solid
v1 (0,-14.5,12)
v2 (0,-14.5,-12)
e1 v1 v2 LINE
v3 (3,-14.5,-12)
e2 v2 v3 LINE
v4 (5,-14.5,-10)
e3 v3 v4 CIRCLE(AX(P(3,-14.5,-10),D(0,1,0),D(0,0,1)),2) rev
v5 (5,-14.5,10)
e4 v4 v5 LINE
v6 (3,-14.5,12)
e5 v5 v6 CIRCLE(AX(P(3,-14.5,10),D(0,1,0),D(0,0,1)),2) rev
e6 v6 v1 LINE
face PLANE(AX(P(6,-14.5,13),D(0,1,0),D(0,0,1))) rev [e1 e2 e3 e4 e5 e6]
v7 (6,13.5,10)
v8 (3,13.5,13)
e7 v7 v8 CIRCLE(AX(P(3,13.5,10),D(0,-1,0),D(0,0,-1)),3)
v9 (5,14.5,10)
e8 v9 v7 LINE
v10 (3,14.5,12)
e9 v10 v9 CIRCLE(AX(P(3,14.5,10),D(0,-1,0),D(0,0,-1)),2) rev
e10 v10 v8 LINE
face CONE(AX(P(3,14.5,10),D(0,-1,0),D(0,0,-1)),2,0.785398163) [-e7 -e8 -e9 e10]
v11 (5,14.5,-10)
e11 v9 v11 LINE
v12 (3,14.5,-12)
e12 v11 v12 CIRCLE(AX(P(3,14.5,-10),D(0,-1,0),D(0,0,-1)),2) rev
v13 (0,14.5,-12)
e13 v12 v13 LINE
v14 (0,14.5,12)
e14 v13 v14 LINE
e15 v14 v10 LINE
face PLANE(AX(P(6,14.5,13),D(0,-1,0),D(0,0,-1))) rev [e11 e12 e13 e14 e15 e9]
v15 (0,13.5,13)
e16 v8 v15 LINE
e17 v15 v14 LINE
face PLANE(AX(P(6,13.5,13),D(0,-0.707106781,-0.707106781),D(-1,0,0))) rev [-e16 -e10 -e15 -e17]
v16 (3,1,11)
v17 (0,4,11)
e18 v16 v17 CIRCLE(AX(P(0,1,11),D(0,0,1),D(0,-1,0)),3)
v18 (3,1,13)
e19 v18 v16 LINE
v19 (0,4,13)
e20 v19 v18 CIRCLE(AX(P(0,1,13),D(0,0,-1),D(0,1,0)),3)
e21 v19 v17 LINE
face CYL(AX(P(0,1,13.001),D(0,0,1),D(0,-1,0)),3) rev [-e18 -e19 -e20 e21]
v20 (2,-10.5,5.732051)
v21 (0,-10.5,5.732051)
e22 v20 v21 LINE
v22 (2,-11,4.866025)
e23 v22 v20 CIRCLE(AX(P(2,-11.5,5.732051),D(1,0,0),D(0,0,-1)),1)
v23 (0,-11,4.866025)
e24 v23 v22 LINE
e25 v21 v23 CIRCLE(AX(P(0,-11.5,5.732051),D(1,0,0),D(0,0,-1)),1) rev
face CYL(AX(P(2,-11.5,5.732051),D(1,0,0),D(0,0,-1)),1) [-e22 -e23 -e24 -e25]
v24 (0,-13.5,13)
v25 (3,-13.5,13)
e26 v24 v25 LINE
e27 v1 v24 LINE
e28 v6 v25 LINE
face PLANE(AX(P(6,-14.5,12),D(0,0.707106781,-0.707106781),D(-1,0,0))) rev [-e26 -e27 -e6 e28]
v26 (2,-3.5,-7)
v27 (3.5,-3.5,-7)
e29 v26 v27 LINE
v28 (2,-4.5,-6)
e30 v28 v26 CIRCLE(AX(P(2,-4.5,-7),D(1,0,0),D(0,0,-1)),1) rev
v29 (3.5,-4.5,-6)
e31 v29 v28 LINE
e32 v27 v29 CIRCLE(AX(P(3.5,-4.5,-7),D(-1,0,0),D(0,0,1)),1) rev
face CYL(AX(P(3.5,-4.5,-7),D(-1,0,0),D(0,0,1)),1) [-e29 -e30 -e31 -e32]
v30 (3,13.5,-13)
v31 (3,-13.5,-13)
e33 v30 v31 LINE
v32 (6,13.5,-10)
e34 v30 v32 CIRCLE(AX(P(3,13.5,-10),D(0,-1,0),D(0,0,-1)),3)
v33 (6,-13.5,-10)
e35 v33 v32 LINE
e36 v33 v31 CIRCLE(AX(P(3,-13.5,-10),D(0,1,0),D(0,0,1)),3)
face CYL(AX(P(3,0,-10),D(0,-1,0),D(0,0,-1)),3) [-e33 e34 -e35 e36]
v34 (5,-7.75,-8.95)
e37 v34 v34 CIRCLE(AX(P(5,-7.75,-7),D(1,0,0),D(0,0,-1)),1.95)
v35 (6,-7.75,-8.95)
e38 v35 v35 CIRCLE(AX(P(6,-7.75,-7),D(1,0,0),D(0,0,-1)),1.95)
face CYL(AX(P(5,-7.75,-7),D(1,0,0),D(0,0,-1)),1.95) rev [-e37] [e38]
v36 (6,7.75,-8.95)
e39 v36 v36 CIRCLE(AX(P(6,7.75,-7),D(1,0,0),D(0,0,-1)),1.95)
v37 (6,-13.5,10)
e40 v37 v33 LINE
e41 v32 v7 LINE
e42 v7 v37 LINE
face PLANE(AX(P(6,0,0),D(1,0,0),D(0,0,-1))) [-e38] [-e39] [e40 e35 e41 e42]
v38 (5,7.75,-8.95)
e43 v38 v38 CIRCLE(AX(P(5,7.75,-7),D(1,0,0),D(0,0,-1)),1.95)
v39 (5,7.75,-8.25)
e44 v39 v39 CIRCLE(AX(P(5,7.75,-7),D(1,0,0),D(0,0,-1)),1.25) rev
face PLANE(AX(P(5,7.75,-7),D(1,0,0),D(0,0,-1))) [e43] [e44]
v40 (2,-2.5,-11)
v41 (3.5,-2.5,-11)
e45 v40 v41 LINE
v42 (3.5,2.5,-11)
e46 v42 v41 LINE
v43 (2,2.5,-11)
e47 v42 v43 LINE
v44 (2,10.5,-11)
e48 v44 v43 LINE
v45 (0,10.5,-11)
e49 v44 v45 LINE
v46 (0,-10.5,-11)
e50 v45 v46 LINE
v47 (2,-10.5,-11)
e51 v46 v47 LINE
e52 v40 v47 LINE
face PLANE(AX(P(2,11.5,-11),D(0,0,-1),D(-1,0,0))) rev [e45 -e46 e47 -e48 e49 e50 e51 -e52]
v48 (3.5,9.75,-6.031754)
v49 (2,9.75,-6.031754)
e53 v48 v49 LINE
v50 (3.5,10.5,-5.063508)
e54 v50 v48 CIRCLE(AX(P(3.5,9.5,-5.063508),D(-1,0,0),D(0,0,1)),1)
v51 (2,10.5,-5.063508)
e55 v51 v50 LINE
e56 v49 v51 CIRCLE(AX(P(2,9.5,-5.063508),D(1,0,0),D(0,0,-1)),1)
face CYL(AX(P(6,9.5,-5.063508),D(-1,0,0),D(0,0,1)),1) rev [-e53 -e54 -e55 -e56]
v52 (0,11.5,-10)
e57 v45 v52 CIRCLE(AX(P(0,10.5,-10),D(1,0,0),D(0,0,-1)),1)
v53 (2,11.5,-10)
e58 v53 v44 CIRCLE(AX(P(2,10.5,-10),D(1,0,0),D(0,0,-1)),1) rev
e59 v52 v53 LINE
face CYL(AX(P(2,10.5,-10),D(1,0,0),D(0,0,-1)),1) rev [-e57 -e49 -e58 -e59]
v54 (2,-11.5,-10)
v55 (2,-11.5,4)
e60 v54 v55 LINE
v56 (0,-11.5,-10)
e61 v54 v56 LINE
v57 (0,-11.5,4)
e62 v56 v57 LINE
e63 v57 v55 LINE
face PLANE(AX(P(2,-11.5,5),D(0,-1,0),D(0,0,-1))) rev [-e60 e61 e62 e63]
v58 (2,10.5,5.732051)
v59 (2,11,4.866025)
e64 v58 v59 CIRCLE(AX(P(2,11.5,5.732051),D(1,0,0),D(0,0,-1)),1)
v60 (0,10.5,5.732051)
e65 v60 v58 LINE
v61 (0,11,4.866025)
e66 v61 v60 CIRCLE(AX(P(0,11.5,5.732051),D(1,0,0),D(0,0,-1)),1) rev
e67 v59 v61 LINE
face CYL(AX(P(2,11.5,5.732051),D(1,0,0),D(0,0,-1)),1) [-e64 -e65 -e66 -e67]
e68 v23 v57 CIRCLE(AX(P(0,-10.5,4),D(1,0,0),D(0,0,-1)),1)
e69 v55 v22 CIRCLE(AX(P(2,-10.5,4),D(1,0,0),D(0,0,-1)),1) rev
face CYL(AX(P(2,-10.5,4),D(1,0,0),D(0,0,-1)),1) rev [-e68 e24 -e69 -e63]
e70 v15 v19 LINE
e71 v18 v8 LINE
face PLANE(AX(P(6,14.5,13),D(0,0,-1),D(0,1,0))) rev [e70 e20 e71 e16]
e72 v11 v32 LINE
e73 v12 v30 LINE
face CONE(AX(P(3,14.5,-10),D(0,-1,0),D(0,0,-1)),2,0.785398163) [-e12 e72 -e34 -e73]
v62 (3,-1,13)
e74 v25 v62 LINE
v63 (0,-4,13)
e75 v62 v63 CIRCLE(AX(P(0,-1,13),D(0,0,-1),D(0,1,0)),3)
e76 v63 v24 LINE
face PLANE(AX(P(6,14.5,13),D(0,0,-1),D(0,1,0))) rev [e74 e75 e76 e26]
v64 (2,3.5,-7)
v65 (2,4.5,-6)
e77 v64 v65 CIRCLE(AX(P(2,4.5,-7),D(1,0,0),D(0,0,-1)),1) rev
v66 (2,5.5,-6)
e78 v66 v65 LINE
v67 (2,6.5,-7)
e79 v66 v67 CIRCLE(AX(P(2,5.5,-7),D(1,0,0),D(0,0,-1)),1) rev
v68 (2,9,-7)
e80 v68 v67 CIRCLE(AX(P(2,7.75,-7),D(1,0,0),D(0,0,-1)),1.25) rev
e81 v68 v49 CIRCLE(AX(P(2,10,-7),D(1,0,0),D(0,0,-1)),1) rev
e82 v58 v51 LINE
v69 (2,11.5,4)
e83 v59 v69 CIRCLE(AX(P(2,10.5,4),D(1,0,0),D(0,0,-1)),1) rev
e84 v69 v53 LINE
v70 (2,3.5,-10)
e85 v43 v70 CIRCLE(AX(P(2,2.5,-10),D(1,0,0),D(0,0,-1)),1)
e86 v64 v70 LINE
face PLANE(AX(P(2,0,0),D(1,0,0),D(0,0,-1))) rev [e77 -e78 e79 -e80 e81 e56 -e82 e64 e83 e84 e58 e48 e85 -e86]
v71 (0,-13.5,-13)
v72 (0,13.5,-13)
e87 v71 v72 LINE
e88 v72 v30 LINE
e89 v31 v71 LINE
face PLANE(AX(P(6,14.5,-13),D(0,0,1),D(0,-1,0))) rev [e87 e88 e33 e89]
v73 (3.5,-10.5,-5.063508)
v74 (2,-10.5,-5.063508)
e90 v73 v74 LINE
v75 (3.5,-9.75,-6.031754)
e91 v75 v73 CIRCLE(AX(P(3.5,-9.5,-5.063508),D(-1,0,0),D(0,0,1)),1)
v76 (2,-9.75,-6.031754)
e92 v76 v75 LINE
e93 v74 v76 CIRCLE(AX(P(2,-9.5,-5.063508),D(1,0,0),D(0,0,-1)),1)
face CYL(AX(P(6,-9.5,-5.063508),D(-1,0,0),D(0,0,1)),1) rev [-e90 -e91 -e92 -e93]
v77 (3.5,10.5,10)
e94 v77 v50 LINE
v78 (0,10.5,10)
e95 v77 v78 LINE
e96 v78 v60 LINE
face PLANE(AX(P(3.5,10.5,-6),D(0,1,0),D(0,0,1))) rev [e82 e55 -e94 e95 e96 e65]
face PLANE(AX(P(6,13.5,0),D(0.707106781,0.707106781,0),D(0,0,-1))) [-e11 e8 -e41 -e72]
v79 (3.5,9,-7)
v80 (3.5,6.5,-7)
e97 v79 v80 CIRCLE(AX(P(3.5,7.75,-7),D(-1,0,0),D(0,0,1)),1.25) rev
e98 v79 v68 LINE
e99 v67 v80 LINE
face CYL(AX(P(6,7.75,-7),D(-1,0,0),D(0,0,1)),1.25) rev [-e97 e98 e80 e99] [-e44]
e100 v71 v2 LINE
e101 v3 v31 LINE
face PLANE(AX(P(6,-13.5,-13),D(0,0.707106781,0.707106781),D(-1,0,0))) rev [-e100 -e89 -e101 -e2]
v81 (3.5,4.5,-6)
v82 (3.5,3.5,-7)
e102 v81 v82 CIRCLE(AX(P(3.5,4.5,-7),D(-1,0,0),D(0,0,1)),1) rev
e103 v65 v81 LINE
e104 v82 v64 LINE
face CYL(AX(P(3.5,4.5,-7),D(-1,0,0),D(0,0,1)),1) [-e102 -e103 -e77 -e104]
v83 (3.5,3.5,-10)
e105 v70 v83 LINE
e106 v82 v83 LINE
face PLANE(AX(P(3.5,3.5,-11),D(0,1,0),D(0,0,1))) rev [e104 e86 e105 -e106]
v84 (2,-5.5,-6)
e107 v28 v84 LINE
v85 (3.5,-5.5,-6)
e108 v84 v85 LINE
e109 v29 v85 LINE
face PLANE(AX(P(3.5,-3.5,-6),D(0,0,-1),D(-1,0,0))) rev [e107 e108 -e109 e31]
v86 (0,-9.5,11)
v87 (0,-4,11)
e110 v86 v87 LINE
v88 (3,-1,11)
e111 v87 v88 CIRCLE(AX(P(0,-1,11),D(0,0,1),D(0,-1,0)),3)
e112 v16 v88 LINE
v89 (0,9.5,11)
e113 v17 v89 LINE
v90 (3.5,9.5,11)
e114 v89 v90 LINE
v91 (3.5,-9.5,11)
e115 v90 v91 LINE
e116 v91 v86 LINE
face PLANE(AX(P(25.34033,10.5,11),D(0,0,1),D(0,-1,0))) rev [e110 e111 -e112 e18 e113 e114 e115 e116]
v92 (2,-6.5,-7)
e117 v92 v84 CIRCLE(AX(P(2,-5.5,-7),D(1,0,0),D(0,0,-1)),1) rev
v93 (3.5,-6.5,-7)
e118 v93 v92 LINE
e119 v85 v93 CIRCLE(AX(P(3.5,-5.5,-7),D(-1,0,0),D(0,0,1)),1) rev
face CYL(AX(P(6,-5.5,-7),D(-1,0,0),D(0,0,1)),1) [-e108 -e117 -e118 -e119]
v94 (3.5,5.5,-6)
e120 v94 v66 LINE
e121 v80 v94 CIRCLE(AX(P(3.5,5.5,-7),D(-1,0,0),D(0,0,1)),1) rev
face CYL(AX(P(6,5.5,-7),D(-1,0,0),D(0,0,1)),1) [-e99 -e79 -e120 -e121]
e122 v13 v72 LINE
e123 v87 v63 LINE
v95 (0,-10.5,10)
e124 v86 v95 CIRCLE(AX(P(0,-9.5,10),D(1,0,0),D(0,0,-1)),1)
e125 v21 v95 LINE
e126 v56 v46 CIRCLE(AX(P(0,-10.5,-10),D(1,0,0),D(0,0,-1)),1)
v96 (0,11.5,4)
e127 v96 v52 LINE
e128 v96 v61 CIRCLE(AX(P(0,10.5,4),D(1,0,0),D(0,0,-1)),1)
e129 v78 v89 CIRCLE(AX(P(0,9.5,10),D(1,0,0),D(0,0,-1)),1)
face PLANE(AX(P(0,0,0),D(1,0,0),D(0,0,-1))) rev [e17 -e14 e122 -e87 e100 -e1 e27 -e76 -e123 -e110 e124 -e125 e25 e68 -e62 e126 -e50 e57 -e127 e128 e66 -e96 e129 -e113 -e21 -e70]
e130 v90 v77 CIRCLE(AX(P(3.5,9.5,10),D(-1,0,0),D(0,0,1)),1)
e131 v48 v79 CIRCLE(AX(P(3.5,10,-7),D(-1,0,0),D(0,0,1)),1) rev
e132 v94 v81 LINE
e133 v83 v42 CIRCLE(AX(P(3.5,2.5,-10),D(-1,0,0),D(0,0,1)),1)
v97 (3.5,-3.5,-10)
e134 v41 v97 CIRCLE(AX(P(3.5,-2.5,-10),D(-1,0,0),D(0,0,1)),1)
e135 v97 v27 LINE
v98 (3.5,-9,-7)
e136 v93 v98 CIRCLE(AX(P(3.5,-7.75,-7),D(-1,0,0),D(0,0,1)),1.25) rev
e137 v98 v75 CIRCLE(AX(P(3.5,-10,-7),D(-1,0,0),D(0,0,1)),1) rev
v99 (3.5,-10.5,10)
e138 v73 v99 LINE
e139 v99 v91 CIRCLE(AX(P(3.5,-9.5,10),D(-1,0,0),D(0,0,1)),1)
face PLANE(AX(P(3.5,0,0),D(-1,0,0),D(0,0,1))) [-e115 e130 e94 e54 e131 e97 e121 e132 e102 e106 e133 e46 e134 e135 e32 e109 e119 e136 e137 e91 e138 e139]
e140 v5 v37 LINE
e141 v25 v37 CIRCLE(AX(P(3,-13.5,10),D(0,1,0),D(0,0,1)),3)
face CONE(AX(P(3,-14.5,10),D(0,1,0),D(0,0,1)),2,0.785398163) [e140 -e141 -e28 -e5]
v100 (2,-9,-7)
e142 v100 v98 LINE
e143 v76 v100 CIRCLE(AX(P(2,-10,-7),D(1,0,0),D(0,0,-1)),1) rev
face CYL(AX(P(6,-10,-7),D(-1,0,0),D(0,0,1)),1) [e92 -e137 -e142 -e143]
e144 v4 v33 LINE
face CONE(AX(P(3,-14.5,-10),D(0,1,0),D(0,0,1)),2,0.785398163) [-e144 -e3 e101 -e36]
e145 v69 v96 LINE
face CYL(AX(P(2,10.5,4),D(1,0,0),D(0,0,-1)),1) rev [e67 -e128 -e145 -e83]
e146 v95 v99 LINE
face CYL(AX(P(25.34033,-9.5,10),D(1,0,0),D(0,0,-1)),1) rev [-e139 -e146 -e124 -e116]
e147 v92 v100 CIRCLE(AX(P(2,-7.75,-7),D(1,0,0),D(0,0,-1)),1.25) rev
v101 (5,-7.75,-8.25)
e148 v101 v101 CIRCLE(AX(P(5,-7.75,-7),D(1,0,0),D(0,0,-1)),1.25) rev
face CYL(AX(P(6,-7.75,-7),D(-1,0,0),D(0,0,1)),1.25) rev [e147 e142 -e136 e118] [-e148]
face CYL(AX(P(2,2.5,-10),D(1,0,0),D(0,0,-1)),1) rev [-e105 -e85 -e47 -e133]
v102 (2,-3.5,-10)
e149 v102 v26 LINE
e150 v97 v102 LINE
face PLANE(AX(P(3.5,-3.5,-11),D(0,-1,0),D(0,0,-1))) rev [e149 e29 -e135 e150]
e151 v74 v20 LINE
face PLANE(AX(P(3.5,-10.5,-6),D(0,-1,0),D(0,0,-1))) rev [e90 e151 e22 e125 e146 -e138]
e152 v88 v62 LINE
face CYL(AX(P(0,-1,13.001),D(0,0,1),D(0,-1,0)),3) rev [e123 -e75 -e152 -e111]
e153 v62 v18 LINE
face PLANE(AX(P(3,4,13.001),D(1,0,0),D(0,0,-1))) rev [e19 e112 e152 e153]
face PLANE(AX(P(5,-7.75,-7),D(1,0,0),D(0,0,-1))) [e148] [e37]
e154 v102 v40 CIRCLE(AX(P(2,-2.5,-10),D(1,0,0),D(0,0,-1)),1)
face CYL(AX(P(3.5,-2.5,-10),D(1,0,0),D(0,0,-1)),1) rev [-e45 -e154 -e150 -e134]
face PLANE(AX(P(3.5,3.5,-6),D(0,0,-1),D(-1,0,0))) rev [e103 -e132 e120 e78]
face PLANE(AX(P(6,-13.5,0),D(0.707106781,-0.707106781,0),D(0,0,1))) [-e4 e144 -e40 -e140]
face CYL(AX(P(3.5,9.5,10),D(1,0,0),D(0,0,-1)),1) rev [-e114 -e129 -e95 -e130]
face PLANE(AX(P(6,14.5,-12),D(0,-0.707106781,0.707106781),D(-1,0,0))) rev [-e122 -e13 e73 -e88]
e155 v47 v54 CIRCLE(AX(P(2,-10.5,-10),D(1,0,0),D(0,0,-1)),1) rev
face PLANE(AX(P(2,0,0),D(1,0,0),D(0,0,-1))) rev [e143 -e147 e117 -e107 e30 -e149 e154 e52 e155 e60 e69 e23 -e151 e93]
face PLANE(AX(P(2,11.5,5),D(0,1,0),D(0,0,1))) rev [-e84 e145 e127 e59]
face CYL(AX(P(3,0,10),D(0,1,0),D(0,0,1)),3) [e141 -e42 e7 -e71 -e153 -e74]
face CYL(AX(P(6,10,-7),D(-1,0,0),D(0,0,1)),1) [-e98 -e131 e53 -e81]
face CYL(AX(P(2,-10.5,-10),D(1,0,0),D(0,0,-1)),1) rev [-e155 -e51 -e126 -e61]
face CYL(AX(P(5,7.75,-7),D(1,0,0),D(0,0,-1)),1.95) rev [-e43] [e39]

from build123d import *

# Parameters (mm, degrees)
SKETCH_1_W          = 26
SKETCH_1_H          = 29
EXTRUDE_1_DEPTH     = 6
SKETCH_2_R          = 1.25
CUT_EXTRUDE_1_DEPTH = 21.377683872
SKETCH_4_W          = 16
SKETCH_4_H          = 23
CUT_EXTRUDE_3_DEPTH = 2
CUT_EXTRUDE_4_DEPTH = 1.5
FILLET_1_R          = 1
SKETCH_6_R          = 1.95
CUT_EXTRUDE_5_DEPTH = 1
FILLET_3_R          = 3
SKETCH_8_W          = 6
SKETCH_8_H          = 21
CUT_EXTRUDE_6_DEPTH = 3.5
FILLET_2_R          = 1
FILLET_4_R          = 1
CUT_EXTRUDE_7_REACH = 30.675
SKETCH_9_W          = 6
SKETCH_9_H          = 8
FILLET_5_R          = 3
CHAMFER_2_SIZE      = 1


# Some blends are built 0.0001 mm under size
with BuildPart() as part:
    # Эскиз1 → Бобышка-Вытянуть1 (new body)
    with BuildSketch(Plane(origin=(0, 0, 0), x_dir=(0, 0, -1), z_dir=(1, 0, 0))):
        Rectangle(SKETCH_1_W, SKETCH_1_H)
    extrude(amount=EXTRUDE_1_DEPTH)

    # Эскиз2 → Вырез-Вытянуть1 (cut, through all)
    with BuildSketch(Plane.ZY):
        with Locations((-7, 7.75)):
            Circle(SKETCH_2_R)
        with Locations((-7, -7.75)):
            Circle(SKETCH_2_R)
    extrude(amount=-CUT_EXTRUDE_1_DEPTH, mode=Mode.SUBTRACT)

    # Эскиз4 → Вырез-Вытянуть3 (cut)
    with BuildSketch(Plane.ZY):
        with Locations((-3, 0)):
            Rectangle(SKETCH_4_W, SKETCH_4_H)
    extrude(amount=-CUT_EXTRUDE_3_DEPTH, mode=Mode.SUBTRACT)

    # Эскиз5 → Вырез-Вытянуть4 (cut)
    with BuildSketch(Plane.ZY.offset(-2)):
        Polygon((-11, -3.5), (-11, 3.5), (-6, 3.5), (-6, 10.5), (5, 10.5), (5, -10.5), (-6, -10.5), (-6, -3.5), align=None)
    extrude(amount=-CUT_EXTRUDE_4_DEPTH, mode=Mode.SUBTRACT)

    # Скругление1
    fillet_1_edges = [part.edges().sort_by_distance(p)[0] for p in [
        (2.75, 7, -6),
        (2.75, 3.5, -6),
        (2.75, 8.5, -6),
        (2.75, -8.5, -6),
        (2.75, -7, -6),
        (2.75, 3.5, -11),
        (2.75, -3.5, -6),
        (2.75, -3.5, -11),
    ]]
    fillet(fillet_1_edges, radius=FILLET_1_R)

    # Эскиз6 → Вырез-Вытянуть5 (cut)
    with BuildSketch(Plane(origin=(6, 0, 0), x_dir=(0, 0, -1), z_dir=(1, 0, 0))):
        with Locations((7, 7.75)):
            Circle(SKETCH_6_R)
        with Locations((7, -7.75)):
            Circle(SKETCH_6_R)
    extrude(amount=-CUT_EXTRUDE_5_DEPTH, mode=Mode.SUBTRACT)

    # Скругление3
    fillet_3_edges = [part.edges().sort_by_distance(p)[0] for p in [
        (6, 0, 13),
        (6, 0, -13),
    ]]
    fillet(fillet_3_edges, radius=FILLET_3_R)

    # Эскиз8 → Вырез-Вытянуть6 (cut)
    with BuildSketch(Plane.ZY):
        with Locations((8, 0)):
            Rectangle(SKETCH_8_W, SKETCH_8_H)
    extrude(amount=-CUT_EXTRUDE_6_DEPTH, mode=Mode.SUBTRACT)

    # Скругление2
    fillet_2_edges = [part.edges().sort_by_distance(p)[0] for p in [
        (1, -11.5, -11),
        (1, -11.5, 5),
        (2.75, -10.5, -6),
        (1, 11.5, -11),
        (1, 11.5, 5),
        (2.75, 10.5, -6),
        (1.75, -10.5, 11),
        (1.75, 10.5, 11),
    ]]
    fillet(fillet_2_edges, radius=FILLET_2_R - 0.0001)  # a hair under: the kernel refuses the full size

    # Скругление4
    # the kernel refuses this fillet: 1 mm, written as the material it takes off along each edge
    with BuildSketch(Plane(origin=(-1.830232679, -10.5, 5), x_dir=(0, 0, 1), z_dir=(1, 0, 0))) as fillet_4_piece_1:
        with BuildLine():
            CenterArc((0.732093072, 1), FILLET_4_R, 209.998345944, 60.001654056)
            Line((-0.133946766, 0.500025001), (-0.22055075, 0.450027501))
            ThreePointArc((-0.22055075, 0.450027501), (-0.1, 0.0001), (-0.1, 0))
            Line((-0.1, 0), (0, -0.1))
            Line((0, -0.1), (0.732093072, -0.1))
            Line((0.732093072, -0.1), (0.732093072, 0))
        make_face()
    extrude(amount=3.830232679, mode=Mode.SUBTRACT)
    with BuildSketch(Plane(origin=(-1.830232679, 10.5, 5), x_dir=(0, 0, 1), z_dir=(1, 0, 0))) as fillet_4_piece_2:
        with BuildLine():
            CenterArc((0.732093072, -1), FILLET_4_R, 90, 60.001654056)
            Line((-0.133946766, -0.500025001), (-0.22055075, -0.450027501))
            ThreePointArc((-0.22055075, -0.450027501), (-0.1, -0.0001), (-0.1, 0))
            Line((-0.1, 0), (0, 0.1))
            Line((0, 0.1), (0.732093072, 0.1))
            Line((0.732093072, 0.1), (0.732093072, 0))
        make_face()
    extrude(amount=3.830232679, mode=Mode.SUBTRACT)

    # Эскиз9 → Вырез-Вытянуть7 (cut, up to next)
    with BuildSketch(Plane(origin=(0, 0, 11), x_dir=(-1, 0, 0), z_dir=(0, 0, -1)), mode=Mode.PRIVATE) as cut_extrude_7_sk1:
        Rectangle(SKETCH_9_W, SKETCH_9_H)
    cut_extrude_7_tool1 = extrude(cut_extrude_7_sk1.sketch, amount=-CUT_EXTRUDE_7_REACH, mode=Mode.PRIVATE) & part.part
    add(cut_extrude_7_tool1.solids().sort_by_distance((0, 0, 11))[0], mode=Mode.SUBTRACT)

    # Скругление5
    fillet_5_edges = [part.edges().sort_by_distance(p)[0] for p in [
        (3, -4, 12),
        (3, 4, 12),
    ]]
    fillet(fillet_5_edges, radius=FILLET_5_R - 0.0001)  # a hair under: the kernel refuses the full size

    # Фаска2
    chamfer_2_edges = [part.edges().sort_by_distance(p)[0] for p in [
        (6, 14.5, 0),
        (6, -14.5, 0),
        (1.5, -14.5, -13),
        (1.5, -14.5, 13),
        (5.121320344, -14.5, -12.121320344),
        (5.121320344, -14.5, 12.121320344),
        (1.5, 14.5, 13),
        (1.5, 14.5, -13),
        (5.121320344, 14.5, -12.121320344),
        (5.121320344, 14.5, 12.121320344),
    ]]
    chamfer(chamfer_2_edges, length=CHAMFER_2_SIZE)


solid = part.part
